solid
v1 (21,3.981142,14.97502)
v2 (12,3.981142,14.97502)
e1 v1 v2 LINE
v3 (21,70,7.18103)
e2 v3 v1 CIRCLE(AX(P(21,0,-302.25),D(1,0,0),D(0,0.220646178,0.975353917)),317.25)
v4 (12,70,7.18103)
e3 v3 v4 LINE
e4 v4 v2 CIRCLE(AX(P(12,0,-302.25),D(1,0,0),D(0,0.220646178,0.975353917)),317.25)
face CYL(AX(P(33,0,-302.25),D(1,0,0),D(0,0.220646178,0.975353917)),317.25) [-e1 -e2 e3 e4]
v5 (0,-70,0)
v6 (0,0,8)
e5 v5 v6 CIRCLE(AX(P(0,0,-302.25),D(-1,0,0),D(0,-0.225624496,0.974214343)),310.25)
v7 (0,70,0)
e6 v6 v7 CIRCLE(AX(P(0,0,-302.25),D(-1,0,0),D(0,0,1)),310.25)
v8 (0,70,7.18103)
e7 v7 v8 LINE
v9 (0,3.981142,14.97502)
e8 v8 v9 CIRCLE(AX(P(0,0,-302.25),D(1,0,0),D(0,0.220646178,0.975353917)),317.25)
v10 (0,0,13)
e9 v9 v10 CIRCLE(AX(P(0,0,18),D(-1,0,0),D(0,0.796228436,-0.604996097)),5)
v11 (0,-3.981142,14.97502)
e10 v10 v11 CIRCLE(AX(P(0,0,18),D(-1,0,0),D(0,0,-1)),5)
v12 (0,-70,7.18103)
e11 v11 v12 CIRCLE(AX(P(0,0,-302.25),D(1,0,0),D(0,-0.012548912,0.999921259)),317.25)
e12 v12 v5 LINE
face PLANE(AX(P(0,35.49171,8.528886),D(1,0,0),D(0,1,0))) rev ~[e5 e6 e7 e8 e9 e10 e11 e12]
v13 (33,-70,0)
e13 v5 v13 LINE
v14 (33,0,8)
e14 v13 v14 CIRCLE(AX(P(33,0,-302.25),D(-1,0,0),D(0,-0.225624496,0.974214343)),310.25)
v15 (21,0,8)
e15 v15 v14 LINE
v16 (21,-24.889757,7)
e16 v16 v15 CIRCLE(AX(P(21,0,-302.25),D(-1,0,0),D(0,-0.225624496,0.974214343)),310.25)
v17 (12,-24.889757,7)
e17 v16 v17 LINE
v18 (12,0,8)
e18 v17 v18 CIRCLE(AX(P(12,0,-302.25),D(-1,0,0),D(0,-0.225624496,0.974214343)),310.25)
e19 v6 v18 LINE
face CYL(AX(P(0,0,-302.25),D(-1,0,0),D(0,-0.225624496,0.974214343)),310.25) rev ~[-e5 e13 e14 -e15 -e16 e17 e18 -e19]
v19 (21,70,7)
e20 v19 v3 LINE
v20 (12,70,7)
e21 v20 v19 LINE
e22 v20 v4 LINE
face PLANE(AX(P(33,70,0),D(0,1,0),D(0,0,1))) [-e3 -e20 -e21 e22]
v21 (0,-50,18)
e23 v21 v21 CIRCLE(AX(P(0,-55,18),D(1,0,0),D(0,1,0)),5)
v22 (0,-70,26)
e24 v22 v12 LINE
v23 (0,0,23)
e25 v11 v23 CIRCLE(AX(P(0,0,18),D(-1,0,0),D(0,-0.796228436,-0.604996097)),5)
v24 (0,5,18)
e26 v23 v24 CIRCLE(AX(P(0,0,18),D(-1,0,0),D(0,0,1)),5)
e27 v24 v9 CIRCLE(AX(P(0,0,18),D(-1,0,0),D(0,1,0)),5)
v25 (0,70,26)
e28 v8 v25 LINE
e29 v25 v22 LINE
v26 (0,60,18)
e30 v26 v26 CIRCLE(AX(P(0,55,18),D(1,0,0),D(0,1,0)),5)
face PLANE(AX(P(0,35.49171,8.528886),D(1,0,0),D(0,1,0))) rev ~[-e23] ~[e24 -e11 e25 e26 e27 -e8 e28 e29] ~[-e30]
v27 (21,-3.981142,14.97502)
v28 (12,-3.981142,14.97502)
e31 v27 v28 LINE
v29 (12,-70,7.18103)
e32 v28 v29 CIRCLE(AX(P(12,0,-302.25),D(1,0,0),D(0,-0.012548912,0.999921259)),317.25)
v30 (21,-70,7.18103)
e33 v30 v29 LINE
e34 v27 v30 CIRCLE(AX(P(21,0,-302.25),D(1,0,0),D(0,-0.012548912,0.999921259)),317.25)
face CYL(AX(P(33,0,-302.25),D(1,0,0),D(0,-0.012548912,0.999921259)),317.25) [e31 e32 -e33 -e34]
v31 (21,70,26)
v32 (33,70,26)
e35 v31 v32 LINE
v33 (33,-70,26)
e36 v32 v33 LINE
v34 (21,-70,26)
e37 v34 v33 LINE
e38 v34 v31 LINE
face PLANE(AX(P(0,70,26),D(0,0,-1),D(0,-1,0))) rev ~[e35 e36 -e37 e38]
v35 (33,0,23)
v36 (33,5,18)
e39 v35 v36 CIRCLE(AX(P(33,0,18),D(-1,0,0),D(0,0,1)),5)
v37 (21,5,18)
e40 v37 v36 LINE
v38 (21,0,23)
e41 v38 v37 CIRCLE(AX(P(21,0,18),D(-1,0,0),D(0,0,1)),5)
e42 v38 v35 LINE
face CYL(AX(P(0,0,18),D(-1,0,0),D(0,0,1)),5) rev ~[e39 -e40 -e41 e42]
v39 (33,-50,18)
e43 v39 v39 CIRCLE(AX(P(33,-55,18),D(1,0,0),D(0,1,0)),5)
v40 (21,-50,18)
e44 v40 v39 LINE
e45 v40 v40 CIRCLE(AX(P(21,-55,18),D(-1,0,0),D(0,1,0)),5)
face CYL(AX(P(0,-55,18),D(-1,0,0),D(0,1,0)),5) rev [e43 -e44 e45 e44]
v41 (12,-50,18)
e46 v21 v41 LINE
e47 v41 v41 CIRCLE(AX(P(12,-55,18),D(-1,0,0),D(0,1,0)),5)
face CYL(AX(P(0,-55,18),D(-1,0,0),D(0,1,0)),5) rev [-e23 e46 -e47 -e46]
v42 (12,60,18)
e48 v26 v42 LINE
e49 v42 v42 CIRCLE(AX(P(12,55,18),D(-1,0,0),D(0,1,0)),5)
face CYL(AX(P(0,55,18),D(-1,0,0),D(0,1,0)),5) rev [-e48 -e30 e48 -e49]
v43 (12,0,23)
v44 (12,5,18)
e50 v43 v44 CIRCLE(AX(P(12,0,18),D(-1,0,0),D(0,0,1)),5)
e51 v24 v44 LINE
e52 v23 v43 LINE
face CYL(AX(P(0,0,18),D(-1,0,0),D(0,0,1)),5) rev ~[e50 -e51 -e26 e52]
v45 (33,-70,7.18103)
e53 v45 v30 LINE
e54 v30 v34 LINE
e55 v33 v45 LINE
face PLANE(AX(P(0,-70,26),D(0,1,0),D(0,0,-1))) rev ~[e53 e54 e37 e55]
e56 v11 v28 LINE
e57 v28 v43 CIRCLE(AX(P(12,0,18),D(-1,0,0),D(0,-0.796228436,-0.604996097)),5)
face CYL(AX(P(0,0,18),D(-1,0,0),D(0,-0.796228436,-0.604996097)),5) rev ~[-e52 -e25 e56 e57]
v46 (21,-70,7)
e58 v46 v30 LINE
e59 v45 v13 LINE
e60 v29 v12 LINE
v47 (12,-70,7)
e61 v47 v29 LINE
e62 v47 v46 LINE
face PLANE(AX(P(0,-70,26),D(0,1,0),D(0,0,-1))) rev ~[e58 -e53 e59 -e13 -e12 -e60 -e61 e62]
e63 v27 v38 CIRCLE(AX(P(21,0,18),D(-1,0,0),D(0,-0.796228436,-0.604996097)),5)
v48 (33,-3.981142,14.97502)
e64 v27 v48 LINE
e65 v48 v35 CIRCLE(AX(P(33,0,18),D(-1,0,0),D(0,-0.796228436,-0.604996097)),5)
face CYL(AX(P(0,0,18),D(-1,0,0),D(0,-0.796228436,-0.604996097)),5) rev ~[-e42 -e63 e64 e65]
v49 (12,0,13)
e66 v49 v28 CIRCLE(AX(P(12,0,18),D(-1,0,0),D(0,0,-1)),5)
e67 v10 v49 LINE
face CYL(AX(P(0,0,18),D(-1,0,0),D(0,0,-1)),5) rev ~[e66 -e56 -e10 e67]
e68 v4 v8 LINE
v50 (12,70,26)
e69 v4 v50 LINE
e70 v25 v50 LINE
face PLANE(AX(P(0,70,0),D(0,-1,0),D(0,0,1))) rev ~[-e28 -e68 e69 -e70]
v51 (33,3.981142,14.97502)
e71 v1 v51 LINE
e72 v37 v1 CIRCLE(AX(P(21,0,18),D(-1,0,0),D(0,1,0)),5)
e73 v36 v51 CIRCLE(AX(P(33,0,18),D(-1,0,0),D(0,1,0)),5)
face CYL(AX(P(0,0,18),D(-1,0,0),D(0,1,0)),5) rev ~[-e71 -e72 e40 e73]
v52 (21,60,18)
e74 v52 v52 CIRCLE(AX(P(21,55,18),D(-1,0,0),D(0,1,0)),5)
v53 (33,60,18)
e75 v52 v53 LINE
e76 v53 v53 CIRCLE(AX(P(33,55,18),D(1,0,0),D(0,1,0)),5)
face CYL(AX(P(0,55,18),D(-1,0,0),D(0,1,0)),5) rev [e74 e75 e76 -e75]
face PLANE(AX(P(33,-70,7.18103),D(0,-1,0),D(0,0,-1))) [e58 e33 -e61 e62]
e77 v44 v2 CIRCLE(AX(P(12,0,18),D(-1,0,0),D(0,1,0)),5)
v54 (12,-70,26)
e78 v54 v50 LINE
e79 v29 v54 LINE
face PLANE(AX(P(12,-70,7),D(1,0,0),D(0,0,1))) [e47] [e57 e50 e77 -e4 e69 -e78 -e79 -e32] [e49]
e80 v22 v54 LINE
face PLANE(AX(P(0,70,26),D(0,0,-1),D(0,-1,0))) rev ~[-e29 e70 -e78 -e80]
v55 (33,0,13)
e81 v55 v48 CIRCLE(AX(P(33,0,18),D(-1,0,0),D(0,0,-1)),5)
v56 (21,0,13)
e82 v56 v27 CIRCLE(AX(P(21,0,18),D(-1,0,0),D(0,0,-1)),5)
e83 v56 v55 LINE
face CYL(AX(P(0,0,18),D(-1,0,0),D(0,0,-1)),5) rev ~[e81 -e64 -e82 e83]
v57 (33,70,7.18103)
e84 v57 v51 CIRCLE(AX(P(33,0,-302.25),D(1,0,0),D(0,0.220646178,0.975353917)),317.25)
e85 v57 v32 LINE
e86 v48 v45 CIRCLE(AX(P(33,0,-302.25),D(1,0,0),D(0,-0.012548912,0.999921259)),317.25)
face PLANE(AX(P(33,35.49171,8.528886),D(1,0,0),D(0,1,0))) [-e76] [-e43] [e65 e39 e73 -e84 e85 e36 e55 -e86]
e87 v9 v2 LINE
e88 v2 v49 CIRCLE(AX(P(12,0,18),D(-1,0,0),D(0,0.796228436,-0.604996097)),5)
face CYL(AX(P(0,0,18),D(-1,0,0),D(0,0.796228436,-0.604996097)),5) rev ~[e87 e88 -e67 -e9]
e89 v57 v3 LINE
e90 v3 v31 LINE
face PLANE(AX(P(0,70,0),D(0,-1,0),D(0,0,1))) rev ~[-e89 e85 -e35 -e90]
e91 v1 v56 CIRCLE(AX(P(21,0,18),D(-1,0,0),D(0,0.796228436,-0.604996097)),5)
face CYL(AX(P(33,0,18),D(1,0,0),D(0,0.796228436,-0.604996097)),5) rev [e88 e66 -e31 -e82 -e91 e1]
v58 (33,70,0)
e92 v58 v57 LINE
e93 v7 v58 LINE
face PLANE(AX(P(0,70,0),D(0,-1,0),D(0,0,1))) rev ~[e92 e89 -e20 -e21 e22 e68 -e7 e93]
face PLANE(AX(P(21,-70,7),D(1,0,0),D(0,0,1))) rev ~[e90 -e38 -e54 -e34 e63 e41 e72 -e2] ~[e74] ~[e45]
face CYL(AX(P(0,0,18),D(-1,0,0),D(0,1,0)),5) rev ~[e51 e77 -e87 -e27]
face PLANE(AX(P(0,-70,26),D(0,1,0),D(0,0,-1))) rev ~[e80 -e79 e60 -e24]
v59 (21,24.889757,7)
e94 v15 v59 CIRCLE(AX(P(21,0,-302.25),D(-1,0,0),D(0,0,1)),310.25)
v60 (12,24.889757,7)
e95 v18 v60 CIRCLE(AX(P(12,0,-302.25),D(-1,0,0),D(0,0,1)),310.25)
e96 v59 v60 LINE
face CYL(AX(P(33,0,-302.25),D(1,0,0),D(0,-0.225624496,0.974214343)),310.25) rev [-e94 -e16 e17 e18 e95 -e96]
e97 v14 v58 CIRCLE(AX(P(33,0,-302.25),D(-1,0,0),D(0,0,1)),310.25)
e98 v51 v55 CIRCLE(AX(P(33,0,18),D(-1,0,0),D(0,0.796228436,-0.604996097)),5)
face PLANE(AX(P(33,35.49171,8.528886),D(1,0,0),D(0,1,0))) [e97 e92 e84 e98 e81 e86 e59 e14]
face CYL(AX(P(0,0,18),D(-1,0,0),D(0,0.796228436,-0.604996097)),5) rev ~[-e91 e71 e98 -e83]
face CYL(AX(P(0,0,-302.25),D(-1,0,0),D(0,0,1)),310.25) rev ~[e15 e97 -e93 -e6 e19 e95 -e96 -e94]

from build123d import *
from build123d import SkipClean  # not in build123d's __all__

# Parameters (mm, degrees)
F0_R     = 5
F1_DEPTH = 33
F2_W     = 9
F2_H     = 19
F3_DEPTH = 140
F5_DEPTH = 33


with BuildPart() as f1:
    # F0 (on Right) → F1 (new body)
    with BuildSketch(Plane.YZ):
        with BuildLine():
            ThreePointArc((0, 8), (35.2278299076, 5.9935116916), (70, 0))
            Line((70, 0), (70, 7.1810302798))
            ThreePointArc((70, 7.1810302798), (37.1952808389, 12.8120154562), (3.9811421818, 14.975019516))
            ThreePointArc((3.9811421818, 14.975019516), (2.2220595829, 13.5208872296), (0, 13))
            Line((0, 13), (0, 8))
        make_face()
        with BuildLine():
            ThreePointArc((3.9811421818, 14.975019516), (37.1952808389, 12.8120154562), (70, 7.1810302798))
            Line((70, 7.1810302798), (70, 26))
            Line((70, 26), (0, 26))
            Line((0, 26), (0, 23))
            ThreePointArc((0, 23), (3.5355339059, 21.5355339059), (5, 18))
            ThreePointArc((5, 18), (4.7384444129, 16.4040223856), (3.9811421818, 14.975019516))
        make_face()
        with Locations((55, 18)):
            Circle(F0_R, mode=Mode.SUBTRACT)
        with BuildLine():
            Line((-70, 26), (-70, 7.1810302798))
            ThreePointArc((-70, 7.1810302798), (-37.1952808389, 12.8120154562), (-3.9811421818, 14.975019516))
            ThreePointArc((-3.9811421818, 14.975019516), (-4.4791127704, 20.2220595829), (0, 23))
            Line((0, 23), (0, 26))
            Line((0, 26), (-70, 26))
        make_face()
        with Locations((-55, 18)):
            Circle(F0_R, mode=Mode.SUBTRACT)
        with BuildLine():
            Line((-70, 7.1810302798), (-70, 0))
            ThreePointArc((-70, 0), (-35.2278299076, 5.9935116916), (0, 8))
            Line((0, 8), (0, 13))
            ThreePointArc((0, 13), (-2.2220595829, 13.5208872296), (-3.9811421818, 14.975019516))
            ThreePointArc((-3.9811421818, 14.975019516), (-37.1952808389, 12.8120154562), (-70, 7.1810302798))
        make_face()
    extrude(amount=F1_DEPTH)

    # F2 (on face) → F3 (cut)
    with BuildSketch(Plane.XZ.offset(70)):
        with Locations((16.5, 16.5)):
            Rectangle(F2_W, F2_H)
    extrude(amount=-F3_DEPTH, mode=Mode.SUBTRACT)

    # F4 (on face) → F5 (join)
    with BuildSketch(Plane.YZ.offset(33)):
        with BuildLine():
            Line((70, 0), (70, 7.1810302798))
            ThreePointArc((70, 7.1810302798), (37.1952808389, 12.8120154562), (3.9811421818, 14.975019516))
            ThreePointArc((3.9811421818, 14.975019516), (0, 13), (-3.9811421818, 14.975019516))
            ThreePointArc((-3.9811421818, 14.975019516), (-37.1952808389, 12.8120154562), (-70, 7.1810302798))
            Line((-70, 7.1810302798), (-70, 0))
            ThreePointArc((-70, 0), (0, 8), (70, 0))
        make_face()
    with SkipClean():  # cleaning this boolean's faces spoils the solid; the shape is the same uncleaned
        extrude(amount=-F5_DEPTH)


solid = f1.part
